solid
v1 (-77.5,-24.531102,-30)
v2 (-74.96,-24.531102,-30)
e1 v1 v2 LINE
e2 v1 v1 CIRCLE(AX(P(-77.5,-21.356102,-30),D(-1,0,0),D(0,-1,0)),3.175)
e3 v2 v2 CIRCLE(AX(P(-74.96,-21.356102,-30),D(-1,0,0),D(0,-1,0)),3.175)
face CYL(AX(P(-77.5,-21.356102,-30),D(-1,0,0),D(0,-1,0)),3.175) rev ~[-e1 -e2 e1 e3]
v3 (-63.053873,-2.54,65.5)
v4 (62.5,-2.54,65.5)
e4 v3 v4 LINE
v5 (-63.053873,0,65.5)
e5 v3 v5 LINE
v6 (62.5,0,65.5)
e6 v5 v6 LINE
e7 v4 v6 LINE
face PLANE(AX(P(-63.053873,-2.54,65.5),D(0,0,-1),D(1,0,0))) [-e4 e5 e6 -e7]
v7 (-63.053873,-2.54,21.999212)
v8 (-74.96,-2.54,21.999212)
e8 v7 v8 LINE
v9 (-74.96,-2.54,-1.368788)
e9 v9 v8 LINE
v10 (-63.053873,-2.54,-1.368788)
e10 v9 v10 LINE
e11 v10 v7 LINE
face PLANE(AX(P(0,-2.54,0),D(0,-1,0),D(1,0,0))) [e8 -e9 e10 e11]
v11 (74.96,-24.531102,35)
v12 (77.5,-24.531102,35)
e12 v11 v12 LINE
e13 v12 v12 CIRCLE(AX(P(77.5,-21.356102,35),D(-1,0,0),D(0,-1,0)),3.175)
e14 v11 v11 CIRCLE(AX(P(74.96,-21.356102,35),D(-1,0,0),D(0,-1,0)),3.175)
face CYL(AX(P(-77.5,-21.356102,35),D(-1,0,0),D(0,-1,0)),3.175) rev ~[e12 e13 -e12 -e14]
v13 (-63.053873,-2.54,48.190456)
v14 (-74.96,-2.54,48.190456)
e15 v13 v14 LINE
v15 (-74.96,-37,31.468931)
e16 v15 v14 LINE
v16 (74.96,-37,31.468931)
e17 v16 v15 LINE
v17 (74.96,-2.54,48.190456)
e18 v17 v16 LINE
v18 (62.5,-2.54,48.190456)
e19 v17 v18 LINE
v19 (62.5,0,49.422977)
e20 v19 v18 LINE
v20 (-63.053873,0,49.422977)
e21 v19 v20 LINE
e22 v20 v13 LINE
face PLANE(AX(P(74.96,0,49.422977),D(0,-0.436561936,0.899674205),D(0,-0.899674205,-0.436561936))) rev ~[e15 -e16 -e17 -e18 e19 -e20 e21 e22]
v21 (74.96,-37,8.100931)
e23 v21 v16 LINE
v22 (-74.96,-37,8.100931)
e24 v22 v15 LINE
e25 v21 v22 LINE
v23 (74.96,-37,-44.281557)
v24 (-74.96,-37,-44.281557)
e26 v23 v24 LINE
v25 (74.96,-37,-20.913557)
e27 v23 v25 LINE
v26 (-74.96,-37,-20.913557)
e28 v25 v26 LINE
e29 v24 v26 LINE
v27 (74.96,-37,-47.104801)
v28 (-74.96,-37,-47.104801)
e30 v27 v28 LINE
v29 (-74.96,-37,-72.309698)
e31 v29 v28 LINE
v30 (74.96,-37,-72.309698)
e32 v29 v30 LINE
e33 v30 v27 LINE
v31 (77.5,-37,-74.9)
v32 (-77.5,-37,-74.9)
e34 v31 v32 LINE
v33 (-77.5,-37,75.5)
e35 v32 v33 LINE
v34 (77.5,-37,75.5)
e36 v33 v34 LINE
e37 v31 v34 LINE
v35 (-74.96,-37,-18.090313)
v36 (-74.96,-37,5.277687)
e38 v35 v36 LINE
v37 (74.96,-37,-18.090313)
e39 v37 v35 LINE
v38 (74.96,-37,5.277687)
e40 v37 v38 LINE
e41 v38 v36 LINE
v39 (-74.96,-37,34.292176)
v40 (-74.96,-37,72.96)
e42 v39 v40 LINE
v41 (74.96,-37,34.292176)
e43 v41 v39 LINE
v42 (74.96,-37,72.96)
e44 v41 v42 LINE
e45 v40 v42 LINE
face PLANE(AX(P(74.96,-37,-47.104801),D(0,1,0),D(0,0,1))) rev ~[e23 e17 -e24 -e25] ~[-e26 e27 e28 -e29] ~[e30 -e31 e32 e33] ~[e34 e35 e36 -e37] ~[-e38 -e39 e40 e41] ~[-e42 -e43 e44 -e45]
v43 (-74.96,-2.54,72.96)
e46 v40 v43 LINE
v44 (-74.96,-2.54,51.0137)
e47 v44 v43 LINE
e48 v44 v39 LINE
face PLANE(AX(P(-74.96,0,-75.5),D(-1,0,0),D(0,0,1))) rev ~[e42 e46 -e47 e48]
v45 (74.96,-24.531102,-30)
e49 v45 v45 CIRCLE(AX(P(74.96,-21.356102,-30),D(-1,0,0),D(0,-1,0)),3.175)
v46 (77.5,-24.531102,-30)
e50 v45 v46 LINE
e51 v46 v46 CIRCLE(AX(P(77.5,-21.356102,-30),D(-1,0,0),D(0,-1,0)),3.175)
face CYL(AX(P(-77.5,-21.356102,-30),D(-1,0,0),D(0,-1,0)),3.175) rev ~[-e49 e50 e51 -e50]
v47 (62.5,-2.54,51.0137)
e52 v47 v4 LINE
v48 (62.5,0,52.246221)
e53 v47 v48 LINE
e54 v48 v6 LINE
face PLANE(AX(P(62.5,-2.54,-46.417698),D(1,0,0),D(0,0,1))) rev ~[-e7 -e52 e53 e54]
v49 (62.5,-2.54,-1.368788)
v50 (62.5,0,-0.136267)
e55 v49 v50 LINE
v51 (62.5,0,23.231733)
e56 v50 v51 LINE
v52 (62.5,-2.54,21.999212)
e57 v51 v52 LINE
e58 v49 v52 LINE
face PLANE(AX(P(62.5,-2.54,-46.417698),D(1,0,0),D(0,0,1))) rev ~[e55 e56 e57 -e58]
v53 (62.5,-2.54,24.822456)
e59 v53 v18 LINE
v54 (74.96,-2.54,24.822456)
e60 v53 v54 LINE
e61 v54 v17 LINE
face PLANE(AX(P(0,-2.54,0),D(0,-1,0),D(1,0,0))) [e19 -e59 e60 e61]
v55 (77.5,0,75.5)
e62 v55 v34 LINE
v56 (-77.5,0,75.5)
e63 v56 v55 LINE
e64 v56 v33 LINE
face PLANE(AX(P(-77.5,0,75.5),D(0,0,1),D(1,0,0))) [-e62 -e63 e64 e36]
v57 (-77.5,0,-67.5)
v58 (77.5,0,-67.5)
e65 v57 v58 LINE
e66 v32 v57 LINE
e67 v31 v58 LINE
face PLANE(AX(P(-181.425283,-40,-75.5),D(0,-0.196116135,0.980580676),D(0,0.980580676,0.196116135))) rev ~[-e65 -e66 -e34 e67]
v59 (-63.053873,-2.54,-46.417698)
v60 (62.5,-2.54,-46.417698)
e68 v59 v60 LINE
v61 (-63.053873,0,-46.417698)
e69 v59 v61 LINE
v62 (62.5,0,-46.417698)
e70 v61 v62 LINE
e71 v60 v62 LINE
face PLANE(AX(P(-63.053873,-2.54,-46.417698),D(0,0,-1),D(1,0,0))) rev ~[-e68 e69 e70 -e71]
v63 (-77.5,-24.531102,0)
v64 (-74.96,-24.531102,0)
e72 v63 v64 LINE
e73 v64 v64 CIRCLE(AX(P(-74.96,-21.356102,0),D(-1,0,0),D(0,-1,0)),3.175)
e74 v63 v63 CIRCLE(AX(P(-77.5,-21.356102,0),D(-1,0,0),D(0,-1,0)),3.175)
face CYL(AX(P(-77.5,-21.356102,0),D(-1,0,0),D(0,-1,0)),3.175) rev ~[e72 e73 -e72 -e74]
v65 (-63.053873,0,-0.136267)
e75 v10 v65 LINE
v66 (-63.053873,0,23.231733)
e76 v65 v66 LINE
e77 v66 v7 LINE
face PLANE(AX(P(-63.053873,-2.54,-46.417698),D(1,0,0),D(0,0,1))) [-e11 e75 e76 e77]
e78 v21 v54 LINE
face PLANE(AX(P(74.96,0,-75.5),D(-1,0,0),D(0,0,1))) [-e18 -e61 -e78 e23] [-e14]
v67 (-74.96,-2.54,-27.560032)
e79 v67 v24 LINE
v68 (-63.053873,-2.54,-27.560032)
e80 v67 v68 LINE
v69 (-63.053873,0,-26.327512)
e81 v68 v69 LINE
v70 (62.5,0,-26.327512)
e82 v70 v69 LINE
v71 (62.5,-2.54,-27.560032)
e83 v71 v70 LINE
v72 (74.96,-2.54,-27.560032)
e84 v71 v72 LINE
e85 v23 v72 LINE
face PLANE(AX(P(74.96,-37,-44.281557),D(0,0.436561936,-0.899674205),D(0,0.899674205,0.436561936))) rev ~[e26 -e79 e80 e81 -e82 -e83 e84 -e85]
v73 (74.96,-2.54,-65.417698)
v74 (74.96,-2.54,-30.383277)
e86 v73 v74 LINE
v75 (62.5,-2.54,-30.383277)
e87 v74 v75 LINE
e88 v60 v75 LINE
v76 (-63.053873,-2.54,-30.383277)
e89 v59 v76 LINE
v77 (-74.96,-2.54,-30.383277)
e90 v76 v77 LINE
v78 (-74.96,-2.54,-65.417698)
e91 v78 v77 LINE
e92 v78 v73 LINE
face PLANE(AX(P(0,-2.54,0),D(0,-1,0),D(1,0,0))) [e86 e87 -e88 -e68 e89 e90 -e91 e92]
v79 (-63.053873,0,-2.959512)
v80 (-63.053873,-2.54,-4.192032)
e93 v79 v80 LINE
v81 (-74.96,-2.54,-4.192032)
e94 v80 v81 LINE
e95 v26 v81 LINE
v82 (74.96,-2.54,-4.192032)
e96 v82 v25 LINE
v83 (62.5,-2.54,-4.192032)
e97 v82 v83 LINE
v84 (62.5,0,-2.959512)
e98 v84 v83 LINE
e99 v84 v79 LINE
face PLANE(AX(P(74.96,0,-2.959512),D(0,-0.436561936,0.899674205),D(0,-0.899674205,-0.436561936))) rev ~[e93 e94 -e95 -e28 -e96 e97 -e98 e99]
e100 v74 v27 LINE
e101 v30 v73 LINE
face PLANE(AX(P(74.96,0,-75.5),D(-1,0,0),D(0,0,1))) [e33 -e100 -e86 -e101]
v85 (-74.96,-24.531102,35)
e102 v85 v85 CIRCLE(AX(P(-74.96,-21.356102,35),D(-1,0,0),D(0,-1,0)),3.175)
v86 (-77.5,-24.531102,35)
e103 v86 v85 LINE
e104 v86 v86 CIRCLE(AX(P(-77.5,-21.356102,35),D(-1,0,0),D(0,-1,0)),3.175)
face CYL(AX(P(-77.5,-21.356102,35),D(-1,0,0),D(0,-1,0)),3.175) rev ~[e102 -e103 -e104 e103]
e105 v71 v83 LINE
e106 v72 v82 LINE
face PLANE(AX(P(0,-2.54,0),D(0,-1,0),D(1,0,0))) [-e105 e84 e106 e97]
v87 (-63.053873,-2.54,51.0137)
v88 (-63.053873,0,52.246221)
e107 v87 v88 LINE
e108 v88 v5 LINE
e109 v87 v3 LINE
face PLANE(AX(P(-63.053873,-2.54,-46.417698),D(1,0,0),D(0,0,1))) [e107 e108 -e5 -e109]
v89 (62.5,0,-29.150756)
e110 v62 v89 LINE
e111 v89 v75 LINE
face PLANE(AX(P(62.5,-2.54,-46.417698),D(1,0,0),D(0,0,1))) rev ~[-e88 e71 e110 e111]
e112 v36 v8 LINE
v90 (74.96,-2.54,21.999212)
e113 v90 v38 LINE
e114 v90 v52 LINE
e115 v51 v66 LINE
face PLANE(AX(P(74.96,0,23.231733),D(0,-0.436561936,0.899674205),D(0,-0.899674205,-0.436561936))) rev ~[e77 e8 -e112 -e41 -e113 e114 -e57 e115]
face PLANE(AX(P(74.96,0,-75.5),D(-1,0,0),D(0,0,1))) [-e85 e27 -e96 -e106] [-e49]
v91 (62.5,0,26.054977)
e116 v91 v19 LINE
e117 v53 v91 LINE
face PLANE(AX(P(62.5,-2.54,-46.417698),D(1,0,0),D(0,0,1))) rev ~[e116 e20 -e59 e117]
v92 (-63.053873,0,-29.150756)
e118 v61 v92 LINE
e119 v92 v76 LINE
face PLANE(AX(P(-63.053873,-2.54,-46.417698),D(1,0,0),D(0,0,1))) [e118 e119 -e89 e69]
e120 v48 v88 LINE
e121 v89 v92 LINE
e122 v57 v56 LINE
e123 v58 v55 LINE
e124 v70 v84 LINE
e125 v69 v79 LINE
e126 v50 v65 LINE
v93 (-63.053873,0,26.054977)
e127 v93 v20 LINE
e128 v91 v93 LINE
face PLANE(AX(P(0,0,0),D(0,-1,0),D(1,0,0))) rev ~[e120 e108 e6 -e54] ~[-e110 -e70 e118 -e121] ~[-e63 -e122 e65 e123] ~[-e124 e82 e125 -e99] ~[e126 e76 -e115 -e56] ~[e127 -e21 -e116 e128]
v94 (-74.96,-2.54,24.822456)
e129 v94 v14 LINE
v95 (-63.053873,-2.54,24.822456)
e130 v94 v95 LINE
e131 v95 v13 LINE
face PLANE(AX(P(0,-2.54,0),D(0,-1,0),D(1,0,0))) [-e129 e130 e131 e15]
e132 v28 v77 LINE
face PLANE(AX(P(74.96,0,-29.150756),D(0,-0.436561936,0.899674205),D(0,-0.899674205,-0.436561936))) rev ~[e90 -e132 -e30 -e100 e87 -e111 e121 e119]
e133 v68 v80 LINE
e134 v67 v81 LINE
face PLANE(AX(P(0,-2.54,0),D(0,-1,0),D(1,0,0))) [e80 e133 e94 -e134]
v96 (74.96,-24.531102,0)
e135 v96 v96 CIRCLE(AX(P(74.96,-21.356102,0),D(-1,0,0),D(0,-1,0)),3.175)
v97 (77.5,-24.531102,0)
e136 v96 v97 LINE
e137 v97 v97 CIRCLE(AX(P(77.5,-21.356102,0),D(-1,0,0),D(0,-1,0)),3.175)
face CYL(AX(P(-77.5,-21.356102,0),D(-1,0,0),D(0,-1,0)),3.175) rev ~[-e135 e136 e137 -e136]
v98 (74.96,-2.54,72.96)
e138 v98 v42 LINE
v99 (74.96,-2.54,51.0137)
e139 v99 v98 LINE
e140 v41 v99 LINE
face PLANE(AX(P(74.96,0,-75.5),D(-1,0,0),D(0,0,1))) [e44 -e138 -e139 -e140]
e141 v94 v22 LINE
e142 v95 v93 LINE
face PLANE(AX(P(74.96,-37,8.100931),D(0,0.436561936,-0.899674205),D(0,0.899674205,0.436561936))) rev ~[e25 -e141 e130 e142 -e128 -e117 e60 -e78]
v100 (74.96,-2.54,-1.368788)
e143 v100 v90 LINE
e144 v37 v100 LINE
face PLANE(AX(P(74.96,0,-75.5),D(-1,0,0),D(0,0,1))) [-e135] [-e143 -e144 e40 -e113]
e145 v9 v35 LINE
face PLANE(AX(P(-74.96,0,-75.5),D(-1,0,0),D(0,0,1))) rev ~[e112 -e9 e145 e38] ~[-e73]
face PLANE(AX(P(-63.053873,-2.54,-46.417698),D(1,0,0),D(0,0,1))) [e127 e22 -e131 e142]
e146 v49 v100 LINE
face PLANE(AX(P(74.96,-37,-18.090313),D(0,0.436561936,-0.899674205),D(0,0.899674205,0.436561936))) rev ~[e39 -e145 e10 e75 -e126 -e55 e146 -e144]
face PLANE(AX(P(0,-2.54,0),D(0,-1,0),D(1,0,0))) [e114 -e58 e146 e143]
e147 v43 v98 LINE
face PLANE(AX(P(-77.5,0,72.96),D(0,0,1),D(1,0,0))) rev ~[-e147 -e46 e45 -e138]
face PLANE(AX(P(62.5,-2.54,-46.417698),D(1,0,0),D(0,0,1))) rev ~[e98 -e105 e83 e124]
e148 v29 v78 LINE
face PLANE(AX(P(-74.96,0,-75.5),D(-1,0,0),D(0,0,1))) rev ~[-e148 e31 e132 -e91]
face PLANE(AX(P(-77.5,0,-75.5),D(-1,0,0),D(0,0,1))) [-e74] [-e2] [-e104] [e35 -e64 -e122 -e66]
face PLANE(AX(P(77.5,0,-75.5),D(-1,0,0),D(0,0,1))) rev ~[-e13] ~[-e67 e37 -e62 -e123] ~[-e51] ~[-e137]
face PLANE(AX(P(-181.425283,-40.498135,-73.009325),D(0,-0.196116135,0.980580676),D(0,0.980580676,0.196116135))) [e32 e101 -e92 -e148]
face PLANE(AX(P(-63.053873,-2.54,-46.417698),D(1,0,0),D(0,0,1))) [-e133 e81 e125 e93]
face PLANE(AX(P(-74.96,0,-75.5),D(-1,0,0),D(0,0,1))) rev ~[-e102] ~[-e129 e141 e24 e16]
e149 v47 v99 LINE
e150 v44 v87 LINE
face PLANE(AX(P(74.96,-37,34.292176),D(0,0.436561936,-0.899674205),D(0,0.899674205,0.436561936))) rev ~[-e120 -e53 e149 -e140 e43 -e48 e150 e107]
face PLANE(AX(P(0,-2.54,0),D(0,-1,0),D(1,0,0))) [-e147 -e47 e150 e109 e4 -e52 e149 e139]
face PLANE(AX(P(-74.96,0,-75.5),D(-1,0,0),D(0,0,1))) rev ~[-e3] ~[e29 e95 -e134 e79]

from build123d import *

# Parameters (mm, degrees)
F0_W        = 155
F0_H        = 151
F1_DEPTH    = 37
F2_T1_DEPTH = 362.8505669038
F3_T        = -2.54
F4_W        = 125.55387271
F4_H        = 111.9176980871
F5_DEPTH    = 25.4
F6_R        = 3.175
F7_DEPTH    = 155.001
F9_DEPTH    = 152.46


# Not quite as in the source:
# - a fillet or chamfer that OpenCascade refuses, or shapes differently, is made with other operations: its cross-section is extruded or revolved along the edge and cut away or added


with BuildPart() as f1:
    # F0 (on Front) → F1 (new body)
    with BuildSketch(Plane.XZ):
        Rectangle(F0_W, F0_H)
    extrude(amount=F1_DEPTH)

    # F2: chamfer of 40 x 8 on 1 edges, made by hand

    # F2_s2 → F2_t1 (cut)
    with BuildSketch(Plane.YZ.offset(-181.4252834519)):
        Polygon((-40, -75.5), (0, -67.5), (0, -75.5), align=None)
    extrude(amount=F2_T1_DEPTH, mode=Mode.SUBTRACT)

    # F3
    f3_openings = [f1.faces().sort_by_distance(p)[0] for p in [
        (0, -37, 0.3),
    ]]
    offset(amount=F3_T, openings=f3_openings)

    # F4 (on face) → F5 (cut)
    with BuildSketch(Plane.XZ.offset(2.54)):
        with Locations((-0.276936355, 9.5411509565)):
            Rectangle(F4_W, F4_H)
    extrude(amount=-F5_DEPTH, mode=Mode.SUBTRACT)

    # F6 (on face) → F7 (cut, through all)
    with BuildSketch(Plane(origin=(-77.5, 0, 0), x_dir=(0, -1, 0), z_dir=(-1, 0, 0))):
        with Locations((21.3561020792, 0)):
            Circle(F6_R)
        with Locations((21.3561020792, 35)):
            Circle(F6_R)
        with Locations((21.3561020792, -30)):
            Circle(F6_R)
    extrude(amount=-F7_DEPTH, mode=Mode.SUBTRACT)

    # F8 (on face) → F9 (join, through all)
    with BuildSketch(Plane(origin=(74.96, 0, 0), x_dir=(0, -1, 0), z_dir=(-1, 0, 0))):
        Polygon((0, -29.1507557497), (37, -47.1048012634), (37, -44.281557044), (0, -26.3275115302), align=None)
        Polygon((0, -2.9595115302), (37, -20.913557044), (37, -18.0903128246), (0, -0.1362673108), align=None)
        Polygon((0, 23.2317326892), (37, 5.2776871754), (37, 8.1009313948), (0, 26.0549769086), align=None)
        Polygon((0, 49.4229769086), (37, 31.4689313948), (37, 34.2921756143), (0, 52.246221128), align=None)
    extrude(amount=F9_DEPTH)


solid = f1.part
